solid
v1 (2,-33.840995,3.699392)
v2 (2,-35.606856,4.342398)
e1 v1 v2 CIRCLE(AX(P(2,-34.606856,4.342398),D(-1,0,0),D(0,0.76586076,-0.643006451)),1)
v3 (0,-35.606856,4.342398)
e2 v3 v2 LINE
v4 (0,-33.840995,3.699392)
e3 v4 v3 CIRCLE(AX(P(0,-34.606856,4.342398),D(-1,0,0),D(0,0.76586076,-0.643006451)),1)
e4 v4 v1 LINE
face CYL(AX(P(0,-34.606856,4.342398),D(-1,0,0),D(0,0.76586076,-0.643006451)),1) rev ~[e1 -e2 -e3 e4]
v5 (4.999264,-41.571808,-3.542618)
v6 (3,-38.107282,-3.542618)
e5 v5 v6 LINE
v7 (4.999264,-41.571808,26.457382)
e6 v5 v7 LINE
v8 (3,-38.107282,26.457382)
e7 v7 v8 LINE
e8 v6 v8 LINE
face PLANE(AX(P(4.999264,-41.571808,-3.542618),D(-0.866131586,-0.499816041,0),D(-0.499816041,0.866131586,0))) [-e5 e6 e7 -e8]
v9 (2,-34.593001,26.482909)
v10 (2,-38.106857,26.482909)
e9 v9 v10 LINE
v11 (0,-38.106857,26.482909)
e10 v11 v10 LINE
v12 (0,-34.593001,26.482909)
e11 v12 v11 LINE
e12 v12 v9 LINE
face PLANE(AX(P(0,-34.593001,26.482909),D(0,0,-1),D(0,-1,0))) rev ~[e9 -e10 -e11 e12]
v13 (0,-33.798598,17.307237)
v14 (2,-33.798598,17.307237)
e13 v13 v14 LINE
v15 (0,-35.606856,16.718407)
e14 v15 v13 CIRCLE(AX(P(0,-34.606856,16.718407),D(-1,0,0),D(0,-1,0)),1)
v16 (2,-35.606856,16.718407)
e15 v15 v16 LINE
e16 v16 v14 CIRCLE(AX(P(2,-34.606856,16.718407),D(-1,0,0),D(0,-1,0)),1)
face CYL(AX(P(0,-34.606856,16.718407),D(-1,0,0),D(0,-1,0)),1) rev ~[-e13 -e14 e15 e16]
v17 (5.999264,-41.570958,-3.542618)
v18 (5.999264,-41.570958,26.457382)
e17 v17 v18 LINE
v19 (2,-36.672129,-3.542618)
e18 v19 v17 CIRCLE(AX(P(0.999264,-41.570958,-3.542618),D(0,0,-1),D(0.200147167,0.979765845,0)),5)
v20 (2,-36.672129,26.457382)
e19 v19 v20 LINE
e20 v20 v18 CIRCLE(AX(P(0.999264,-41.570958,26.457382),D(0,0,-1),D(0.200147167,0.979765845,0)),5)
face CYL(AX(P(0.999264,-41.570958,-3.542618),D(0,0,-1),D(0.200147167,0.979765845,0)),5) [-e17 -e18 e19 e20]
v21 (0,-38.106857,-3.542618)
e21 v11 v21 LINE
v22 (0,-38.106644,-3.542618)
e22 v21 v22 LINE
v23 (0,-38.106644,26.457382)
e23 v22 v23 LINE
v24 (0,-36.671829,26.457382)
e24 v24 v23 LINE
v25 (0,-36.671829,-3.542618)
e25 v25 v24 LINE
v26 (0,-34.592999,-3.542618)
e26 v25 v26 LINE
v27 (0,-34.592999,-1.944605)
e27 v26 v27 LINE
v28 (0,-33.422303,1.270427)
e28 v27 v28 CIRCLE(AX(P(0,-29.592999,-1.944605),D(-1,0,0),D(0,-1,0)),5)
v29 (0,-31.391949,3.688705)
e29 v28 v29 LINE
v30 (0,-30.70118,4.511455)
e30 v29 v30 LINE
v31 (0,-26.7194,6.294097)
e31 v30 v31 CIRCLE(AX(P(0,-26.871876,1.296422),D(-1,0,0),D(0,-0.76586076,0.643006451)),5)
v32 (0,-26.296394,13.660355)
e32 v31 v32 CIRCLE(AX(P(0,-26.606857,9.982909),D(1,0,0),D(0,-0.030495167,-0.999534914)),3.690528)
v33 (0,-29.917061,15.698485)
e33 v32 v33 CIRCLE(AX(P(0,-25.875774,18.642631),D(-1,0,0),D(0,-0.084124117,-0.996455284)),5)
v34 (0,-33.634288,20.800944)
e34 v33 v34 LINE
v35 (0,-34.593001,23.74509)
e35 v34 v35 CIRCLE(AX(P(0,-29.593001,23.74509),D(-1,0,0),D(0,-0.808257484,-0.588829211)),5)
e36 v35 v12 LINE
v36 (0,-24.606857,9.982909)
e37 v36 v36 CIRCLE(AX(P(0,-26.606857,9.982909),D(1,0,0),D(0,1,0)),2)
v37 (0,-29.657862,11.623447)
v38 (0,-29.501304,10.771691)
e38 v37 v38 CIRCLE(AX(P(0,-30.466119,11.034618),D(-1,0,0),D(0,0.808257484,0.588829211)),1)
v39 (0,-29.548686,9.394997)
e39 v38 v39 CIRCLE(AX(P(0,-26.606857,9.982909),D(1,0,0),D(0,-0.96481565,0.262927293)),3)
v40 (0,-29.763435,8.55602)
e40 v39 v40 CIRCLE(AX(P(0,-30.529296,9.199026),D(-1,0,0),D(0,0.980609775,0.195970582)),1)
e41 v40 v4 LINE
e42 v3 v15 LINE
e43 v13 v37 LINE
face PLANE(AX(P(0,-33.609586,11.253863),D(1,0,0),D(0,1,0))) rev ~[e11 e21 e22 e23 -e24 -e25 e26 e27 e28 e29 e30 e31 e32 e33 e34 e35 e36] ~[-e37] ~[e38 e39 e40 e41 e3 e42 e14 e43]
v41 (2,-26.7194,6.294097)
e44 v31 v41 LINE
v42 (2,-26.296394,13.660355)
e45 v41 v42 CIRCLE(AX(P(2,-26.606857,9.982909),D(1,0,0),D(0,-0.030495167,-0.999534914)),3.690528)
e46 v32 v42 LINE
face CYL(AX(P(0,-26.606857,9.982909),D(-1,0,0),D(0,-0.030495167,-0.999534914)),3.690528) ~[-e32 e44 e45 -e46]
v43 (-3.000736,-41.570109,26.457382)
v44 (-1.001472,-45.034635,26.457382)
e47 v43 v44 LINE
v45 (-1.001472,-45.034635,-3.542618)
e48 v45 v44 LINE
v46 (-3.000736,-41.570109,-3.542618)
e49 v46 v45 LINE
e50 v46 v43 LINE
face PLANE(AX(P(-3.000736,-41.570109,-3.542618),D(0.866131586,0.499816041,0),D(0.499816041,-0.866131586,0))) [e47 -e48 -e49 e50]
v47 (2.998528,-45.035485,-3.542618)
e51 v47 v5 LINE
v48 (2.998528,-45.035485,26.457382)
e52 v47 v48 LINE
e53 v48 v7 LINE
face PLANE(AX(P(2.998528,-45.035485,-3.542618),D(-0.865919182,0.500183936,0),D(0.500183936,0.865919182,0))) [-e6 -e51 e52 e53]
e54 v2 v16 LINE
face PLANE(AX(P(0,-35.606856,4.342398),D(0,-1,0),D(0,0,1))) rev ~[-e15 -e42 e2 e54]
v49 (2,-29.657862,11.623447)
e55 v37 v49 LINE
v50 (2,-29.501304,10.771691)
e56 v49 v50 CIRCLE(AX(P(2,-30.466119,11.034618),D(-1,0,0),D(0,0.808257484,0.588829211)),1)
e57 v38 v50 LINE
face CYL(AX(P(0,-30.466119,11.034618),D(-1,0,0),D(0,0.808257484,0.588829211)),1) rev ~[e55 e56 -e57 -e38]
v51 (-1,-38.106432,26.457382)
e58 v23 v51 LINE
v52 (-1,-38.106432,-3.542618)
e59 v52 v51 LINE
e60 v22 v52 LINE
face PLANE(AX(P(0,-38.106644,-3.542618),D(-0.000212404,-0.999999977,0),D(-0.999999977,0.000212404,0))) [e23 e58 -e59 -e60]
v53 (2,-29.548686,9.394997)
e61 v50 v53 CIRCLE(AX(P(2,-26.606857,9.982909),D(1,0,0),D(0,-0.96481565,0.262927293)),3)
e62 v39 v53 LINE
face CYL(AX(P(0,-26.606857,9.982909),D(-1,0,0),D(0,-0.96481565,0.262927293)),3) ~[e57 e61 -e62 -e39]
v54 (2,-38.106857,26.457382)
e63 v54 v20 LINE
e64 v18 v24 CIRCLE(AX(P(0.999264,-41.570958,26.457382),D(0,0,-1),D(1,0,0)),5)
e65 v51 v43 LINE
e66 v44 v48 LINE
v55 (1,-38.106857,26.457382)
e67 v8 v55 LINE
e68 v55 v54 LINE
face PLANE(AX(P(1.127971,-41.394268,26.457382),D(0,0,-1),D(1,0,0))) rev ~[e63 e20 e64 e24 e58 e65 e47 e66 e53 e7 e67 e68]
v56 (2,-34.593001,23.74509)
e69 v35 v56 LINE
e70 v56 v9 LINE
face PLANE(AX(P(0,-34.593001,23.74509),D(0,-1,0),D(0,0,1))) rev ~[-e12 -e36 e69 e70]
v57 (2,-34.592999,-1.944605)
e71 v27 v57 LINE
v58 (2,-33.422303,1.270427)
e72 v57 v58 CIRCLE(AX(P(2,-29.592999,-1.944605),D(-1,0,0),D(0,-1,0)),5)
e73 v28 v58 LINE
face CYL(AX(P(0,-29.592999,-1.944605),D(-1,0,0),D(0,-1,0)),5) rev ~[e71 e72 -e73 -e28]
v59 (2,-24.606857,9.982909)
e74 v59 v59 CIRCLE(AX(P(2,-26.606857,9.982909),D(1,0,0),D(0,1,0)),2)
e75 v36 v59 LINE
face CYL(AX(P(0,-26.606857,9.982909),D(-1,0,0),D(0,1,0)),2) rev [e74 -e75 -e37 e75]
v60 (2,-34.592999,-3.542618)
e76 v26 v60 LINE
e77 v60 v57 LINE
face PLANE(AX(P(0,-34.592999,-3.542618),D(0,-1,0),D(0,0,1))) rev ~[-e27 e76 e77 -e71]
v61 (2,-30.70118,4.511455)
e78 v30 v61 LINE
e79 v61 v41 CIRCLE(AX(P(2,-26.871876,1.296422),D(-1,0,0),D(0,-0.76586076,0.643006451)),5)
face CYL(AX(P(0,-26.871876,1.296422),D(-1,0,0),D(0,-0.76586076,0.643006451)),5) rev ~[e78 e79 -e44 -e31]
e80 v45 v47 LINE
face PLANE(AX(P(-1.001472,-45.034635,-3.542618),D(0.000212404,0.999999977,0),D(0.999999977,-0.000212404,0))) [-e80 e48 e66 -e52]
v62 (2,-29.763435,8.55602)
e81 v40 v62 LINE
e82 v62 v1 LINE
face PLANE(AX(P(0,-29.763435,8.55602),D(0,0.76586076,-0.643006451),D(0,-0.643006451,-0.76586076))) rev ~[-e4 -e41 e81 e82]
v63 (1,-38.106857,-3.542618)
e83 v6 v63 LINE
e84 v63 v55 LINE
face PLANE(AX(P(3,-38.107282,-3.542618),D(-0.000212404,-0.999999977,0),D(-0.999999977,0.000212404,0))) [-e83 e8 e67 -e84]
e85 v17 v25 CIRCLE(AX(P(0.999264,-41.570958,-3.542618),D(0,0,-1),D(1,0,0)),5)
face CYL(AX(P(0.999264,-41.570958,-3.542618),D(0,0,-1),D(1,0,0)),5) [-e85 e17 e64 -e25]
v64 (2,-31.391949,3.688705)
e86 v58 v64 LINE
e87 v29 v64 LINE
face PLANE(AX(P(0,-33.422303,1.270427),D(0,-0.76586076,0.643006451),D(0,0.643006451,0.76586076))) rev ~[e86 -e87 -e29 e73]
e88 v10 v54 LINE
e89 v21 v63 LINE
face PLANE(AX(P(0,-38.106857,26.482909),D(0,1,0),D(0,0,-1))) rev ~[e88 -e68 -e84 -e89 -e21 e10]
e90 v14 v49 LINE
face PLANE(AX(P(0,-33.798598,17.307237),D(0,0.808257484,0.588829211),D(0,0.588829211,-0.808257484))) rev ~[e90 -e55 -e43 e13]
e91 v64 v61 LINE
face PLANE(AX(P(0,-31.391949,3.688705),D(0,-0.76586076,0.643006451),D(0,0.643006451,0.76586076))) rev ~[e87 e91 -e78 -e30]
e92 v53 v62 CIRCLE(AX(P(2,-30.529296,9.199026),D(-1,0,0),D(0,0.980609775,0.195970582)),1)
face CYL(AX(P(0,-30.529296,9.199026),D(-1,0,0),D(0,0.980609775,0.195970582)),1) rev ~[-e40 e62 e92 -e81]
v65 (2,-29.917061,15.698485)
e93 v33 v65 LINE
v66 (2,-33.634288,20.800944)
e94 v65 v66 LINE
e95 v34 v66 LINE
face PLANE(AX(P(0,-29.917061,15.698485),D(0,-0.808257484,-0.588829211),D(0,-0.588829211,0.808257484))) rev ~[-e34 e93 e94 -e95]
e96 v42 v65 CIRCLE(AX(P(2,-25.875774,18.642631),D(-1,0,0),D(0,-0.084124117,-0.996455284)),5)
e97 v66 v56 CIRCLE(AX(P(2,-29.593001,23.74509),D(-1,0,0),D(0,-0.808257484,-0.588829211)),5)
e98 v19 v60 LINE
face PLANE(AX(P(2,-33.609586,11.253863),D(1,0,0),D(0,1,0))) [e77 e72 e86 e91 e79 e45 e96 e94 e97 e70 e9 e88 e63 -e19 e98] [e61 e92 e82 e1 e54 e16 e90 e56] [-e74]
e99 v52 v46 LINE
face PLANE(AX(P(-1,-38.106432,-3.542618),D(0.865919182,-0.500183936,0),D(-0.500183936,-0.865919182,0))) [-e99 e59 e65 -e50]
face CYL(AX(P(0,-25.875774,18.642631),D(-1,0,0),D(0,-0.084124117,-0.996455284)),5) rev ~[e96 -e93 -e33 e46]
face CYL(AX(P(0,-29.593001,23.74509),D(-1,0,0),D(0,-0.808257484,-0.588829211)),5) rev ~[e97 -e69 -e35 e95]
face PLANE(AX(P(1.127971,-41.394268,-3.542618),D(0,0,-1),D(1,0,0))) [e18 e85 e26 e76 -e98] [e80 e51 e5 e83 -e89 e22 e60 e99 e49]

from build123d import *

# Parameters (mm, degrees)
F0_R     = 2
F1_DEPTH = 2
F3_DEPTH = 30


# Not quite as in the source:
# - ends of sketch curves that miss each other by under 0.0002 mm in the source are joined
# - a feature names something its author has since deleted; it is built from what else it names


with BuildPart() as f1:
    # F0 (on Right) → F1 (new body)
    with BuildSketch(Plane.YZ):
        with BuildLine():
            Line((-34.5930008724, 26.4829086736), (-38.1068567038, 26.4829086736))
            Line((-38.1068567038, 26.4829086736), (-38.1068567038, -3.5426183596))
            Line((-38.1068567038, -3.5426183596), (-34.5929991737, -3.5426183596))
            Line((-34.5929991737, -3.5426183596), (-34.5929991737, -1.9446051591))
            ThreePointArc((-34.5929991737, -1.9446051591), (-34.2912179318, -0.233833257), (-33.4223029733, 1.2704270974))
            Line((-33.4223029733, 1.2704270974), (-31.3919489583, 3.6887052743))
            Line((-31.3919489583, 3.6887052743), (-30.7011796085, 4.5114546232))
            ThreePointArc((-30.7011796085, 4.5114546232), (-28.9149664525, 5.8599495795), (-26.7193999751, 6.2940969379))
            ThreePointArc((-26.7193999751, 6.2940969379), (-22.9223984991, 9.7713294978), (-26.2963942816, 13.660354947))
            ThreePointArc((-26.2963942816, 13.660354947), (-28.3284558204, 14.2855279257), (-29.9170611144, 15.6984853104))
            Line((-29.9170611144, 15.6984853104), (-33.634288291, 20.8009439295))
            ThreePointArc((-33.634288291, 20.8009439295), (-34.3472851032, 22.1969357772), (-34.5930008724, 23.7450899858))
            Line((-34.5930008724, 23.7450899858), (-34.5930008724, 26.4829086736))
        make_face()
        with BuildLine():
            ThreePointArc((-29.6578618205, 11.6234470561), (-29.4825953492, 11.2153956919), (-29.5013036541, 10.771690552))
            ThreePointArc((-29.5013036541, 10.771690552), (-29.6050814327, 10.0861001216), (-29.5486860291, 9.3949969281))
            ThreePointArc((-29.5486860291, 9.3949969281), (-29.5605283151, 8.9510554769), (-29.7634350443, 8.5560198949))
            Line((-29.7634350443, 8.5560198949), (-33.8409951472, 3.699391672))
            ThreePointArc((-33.8409951472, 3.699391672), (-34.9490102875, 3.4027543717), (-35.6068559071, 4.3423981233))
            Line((-35.6068559071, 4.3423981233), (-35.6068559071, 16.7184074453))
            ThreePointArc((-35.6068559071, 16.7184074453), (-34.9164867488, 17.6692642914), (-33.7985984234, 17.3072366565))
            Line((-33.7985984234, 17.3072366565), (-29.6578618205, 11.6234470561))
        make_face(mode=Mode.SUBTRACT)
        with Locations((-26.6068567038, 9.9829086736)):
            Circle(F0_R, mode=Mode.SUBTRACT)
    extrude(amount=F1_DEPTH)

    # F2 (on face) → F3 (join)
    with BuildSketch(Plane(origin=(0, 0, -3.5426183596), x_dir=(1, 0, 0), z_dir=(0, 0, -1))):
        with BuildLine():
            Line((-1.0014715791, 45.0346349695), (2.9985283307, 45.035484586))
            Line((2.9985283307, 45.035484586), (4.9992640751, 41.5718078573))
            Line((4.9992640751, 41.5718078573), (2.9999999098, 38.107281512))
            Line((2.9999999098, 38.107281512), (0.9999999926, 38.1068567038))
            Line((0.9999999926, 38.1068567038), (2, 38.1068567038))
            Line((2, 38.1068567038), (2, 36.6721290144))
            ThreePointArc((2, 36.6721290144), (4.8724849939, 38.4089714581), (5.9992641654, 41.5709582407))
            ThreePointArc((5.9992641654, 41.5709582407), (-2.1633043456, 45.4437040901), (0, 36.6718286111))
            Line((0, 36.6718286111), (0, 38.1066442996))
            Line((0, 38.1066442996), (-1, 38.1064318955))
            Line((-1, 38.1064318955), (-3.0007357444, 41.5701086242))
            Line((-3.0007357444, 41.5701086242), (-1.0014715791, 45.0346349695))
        make_face()
    extrude(amount=-F3_DEPTH)


solid = f1.part
